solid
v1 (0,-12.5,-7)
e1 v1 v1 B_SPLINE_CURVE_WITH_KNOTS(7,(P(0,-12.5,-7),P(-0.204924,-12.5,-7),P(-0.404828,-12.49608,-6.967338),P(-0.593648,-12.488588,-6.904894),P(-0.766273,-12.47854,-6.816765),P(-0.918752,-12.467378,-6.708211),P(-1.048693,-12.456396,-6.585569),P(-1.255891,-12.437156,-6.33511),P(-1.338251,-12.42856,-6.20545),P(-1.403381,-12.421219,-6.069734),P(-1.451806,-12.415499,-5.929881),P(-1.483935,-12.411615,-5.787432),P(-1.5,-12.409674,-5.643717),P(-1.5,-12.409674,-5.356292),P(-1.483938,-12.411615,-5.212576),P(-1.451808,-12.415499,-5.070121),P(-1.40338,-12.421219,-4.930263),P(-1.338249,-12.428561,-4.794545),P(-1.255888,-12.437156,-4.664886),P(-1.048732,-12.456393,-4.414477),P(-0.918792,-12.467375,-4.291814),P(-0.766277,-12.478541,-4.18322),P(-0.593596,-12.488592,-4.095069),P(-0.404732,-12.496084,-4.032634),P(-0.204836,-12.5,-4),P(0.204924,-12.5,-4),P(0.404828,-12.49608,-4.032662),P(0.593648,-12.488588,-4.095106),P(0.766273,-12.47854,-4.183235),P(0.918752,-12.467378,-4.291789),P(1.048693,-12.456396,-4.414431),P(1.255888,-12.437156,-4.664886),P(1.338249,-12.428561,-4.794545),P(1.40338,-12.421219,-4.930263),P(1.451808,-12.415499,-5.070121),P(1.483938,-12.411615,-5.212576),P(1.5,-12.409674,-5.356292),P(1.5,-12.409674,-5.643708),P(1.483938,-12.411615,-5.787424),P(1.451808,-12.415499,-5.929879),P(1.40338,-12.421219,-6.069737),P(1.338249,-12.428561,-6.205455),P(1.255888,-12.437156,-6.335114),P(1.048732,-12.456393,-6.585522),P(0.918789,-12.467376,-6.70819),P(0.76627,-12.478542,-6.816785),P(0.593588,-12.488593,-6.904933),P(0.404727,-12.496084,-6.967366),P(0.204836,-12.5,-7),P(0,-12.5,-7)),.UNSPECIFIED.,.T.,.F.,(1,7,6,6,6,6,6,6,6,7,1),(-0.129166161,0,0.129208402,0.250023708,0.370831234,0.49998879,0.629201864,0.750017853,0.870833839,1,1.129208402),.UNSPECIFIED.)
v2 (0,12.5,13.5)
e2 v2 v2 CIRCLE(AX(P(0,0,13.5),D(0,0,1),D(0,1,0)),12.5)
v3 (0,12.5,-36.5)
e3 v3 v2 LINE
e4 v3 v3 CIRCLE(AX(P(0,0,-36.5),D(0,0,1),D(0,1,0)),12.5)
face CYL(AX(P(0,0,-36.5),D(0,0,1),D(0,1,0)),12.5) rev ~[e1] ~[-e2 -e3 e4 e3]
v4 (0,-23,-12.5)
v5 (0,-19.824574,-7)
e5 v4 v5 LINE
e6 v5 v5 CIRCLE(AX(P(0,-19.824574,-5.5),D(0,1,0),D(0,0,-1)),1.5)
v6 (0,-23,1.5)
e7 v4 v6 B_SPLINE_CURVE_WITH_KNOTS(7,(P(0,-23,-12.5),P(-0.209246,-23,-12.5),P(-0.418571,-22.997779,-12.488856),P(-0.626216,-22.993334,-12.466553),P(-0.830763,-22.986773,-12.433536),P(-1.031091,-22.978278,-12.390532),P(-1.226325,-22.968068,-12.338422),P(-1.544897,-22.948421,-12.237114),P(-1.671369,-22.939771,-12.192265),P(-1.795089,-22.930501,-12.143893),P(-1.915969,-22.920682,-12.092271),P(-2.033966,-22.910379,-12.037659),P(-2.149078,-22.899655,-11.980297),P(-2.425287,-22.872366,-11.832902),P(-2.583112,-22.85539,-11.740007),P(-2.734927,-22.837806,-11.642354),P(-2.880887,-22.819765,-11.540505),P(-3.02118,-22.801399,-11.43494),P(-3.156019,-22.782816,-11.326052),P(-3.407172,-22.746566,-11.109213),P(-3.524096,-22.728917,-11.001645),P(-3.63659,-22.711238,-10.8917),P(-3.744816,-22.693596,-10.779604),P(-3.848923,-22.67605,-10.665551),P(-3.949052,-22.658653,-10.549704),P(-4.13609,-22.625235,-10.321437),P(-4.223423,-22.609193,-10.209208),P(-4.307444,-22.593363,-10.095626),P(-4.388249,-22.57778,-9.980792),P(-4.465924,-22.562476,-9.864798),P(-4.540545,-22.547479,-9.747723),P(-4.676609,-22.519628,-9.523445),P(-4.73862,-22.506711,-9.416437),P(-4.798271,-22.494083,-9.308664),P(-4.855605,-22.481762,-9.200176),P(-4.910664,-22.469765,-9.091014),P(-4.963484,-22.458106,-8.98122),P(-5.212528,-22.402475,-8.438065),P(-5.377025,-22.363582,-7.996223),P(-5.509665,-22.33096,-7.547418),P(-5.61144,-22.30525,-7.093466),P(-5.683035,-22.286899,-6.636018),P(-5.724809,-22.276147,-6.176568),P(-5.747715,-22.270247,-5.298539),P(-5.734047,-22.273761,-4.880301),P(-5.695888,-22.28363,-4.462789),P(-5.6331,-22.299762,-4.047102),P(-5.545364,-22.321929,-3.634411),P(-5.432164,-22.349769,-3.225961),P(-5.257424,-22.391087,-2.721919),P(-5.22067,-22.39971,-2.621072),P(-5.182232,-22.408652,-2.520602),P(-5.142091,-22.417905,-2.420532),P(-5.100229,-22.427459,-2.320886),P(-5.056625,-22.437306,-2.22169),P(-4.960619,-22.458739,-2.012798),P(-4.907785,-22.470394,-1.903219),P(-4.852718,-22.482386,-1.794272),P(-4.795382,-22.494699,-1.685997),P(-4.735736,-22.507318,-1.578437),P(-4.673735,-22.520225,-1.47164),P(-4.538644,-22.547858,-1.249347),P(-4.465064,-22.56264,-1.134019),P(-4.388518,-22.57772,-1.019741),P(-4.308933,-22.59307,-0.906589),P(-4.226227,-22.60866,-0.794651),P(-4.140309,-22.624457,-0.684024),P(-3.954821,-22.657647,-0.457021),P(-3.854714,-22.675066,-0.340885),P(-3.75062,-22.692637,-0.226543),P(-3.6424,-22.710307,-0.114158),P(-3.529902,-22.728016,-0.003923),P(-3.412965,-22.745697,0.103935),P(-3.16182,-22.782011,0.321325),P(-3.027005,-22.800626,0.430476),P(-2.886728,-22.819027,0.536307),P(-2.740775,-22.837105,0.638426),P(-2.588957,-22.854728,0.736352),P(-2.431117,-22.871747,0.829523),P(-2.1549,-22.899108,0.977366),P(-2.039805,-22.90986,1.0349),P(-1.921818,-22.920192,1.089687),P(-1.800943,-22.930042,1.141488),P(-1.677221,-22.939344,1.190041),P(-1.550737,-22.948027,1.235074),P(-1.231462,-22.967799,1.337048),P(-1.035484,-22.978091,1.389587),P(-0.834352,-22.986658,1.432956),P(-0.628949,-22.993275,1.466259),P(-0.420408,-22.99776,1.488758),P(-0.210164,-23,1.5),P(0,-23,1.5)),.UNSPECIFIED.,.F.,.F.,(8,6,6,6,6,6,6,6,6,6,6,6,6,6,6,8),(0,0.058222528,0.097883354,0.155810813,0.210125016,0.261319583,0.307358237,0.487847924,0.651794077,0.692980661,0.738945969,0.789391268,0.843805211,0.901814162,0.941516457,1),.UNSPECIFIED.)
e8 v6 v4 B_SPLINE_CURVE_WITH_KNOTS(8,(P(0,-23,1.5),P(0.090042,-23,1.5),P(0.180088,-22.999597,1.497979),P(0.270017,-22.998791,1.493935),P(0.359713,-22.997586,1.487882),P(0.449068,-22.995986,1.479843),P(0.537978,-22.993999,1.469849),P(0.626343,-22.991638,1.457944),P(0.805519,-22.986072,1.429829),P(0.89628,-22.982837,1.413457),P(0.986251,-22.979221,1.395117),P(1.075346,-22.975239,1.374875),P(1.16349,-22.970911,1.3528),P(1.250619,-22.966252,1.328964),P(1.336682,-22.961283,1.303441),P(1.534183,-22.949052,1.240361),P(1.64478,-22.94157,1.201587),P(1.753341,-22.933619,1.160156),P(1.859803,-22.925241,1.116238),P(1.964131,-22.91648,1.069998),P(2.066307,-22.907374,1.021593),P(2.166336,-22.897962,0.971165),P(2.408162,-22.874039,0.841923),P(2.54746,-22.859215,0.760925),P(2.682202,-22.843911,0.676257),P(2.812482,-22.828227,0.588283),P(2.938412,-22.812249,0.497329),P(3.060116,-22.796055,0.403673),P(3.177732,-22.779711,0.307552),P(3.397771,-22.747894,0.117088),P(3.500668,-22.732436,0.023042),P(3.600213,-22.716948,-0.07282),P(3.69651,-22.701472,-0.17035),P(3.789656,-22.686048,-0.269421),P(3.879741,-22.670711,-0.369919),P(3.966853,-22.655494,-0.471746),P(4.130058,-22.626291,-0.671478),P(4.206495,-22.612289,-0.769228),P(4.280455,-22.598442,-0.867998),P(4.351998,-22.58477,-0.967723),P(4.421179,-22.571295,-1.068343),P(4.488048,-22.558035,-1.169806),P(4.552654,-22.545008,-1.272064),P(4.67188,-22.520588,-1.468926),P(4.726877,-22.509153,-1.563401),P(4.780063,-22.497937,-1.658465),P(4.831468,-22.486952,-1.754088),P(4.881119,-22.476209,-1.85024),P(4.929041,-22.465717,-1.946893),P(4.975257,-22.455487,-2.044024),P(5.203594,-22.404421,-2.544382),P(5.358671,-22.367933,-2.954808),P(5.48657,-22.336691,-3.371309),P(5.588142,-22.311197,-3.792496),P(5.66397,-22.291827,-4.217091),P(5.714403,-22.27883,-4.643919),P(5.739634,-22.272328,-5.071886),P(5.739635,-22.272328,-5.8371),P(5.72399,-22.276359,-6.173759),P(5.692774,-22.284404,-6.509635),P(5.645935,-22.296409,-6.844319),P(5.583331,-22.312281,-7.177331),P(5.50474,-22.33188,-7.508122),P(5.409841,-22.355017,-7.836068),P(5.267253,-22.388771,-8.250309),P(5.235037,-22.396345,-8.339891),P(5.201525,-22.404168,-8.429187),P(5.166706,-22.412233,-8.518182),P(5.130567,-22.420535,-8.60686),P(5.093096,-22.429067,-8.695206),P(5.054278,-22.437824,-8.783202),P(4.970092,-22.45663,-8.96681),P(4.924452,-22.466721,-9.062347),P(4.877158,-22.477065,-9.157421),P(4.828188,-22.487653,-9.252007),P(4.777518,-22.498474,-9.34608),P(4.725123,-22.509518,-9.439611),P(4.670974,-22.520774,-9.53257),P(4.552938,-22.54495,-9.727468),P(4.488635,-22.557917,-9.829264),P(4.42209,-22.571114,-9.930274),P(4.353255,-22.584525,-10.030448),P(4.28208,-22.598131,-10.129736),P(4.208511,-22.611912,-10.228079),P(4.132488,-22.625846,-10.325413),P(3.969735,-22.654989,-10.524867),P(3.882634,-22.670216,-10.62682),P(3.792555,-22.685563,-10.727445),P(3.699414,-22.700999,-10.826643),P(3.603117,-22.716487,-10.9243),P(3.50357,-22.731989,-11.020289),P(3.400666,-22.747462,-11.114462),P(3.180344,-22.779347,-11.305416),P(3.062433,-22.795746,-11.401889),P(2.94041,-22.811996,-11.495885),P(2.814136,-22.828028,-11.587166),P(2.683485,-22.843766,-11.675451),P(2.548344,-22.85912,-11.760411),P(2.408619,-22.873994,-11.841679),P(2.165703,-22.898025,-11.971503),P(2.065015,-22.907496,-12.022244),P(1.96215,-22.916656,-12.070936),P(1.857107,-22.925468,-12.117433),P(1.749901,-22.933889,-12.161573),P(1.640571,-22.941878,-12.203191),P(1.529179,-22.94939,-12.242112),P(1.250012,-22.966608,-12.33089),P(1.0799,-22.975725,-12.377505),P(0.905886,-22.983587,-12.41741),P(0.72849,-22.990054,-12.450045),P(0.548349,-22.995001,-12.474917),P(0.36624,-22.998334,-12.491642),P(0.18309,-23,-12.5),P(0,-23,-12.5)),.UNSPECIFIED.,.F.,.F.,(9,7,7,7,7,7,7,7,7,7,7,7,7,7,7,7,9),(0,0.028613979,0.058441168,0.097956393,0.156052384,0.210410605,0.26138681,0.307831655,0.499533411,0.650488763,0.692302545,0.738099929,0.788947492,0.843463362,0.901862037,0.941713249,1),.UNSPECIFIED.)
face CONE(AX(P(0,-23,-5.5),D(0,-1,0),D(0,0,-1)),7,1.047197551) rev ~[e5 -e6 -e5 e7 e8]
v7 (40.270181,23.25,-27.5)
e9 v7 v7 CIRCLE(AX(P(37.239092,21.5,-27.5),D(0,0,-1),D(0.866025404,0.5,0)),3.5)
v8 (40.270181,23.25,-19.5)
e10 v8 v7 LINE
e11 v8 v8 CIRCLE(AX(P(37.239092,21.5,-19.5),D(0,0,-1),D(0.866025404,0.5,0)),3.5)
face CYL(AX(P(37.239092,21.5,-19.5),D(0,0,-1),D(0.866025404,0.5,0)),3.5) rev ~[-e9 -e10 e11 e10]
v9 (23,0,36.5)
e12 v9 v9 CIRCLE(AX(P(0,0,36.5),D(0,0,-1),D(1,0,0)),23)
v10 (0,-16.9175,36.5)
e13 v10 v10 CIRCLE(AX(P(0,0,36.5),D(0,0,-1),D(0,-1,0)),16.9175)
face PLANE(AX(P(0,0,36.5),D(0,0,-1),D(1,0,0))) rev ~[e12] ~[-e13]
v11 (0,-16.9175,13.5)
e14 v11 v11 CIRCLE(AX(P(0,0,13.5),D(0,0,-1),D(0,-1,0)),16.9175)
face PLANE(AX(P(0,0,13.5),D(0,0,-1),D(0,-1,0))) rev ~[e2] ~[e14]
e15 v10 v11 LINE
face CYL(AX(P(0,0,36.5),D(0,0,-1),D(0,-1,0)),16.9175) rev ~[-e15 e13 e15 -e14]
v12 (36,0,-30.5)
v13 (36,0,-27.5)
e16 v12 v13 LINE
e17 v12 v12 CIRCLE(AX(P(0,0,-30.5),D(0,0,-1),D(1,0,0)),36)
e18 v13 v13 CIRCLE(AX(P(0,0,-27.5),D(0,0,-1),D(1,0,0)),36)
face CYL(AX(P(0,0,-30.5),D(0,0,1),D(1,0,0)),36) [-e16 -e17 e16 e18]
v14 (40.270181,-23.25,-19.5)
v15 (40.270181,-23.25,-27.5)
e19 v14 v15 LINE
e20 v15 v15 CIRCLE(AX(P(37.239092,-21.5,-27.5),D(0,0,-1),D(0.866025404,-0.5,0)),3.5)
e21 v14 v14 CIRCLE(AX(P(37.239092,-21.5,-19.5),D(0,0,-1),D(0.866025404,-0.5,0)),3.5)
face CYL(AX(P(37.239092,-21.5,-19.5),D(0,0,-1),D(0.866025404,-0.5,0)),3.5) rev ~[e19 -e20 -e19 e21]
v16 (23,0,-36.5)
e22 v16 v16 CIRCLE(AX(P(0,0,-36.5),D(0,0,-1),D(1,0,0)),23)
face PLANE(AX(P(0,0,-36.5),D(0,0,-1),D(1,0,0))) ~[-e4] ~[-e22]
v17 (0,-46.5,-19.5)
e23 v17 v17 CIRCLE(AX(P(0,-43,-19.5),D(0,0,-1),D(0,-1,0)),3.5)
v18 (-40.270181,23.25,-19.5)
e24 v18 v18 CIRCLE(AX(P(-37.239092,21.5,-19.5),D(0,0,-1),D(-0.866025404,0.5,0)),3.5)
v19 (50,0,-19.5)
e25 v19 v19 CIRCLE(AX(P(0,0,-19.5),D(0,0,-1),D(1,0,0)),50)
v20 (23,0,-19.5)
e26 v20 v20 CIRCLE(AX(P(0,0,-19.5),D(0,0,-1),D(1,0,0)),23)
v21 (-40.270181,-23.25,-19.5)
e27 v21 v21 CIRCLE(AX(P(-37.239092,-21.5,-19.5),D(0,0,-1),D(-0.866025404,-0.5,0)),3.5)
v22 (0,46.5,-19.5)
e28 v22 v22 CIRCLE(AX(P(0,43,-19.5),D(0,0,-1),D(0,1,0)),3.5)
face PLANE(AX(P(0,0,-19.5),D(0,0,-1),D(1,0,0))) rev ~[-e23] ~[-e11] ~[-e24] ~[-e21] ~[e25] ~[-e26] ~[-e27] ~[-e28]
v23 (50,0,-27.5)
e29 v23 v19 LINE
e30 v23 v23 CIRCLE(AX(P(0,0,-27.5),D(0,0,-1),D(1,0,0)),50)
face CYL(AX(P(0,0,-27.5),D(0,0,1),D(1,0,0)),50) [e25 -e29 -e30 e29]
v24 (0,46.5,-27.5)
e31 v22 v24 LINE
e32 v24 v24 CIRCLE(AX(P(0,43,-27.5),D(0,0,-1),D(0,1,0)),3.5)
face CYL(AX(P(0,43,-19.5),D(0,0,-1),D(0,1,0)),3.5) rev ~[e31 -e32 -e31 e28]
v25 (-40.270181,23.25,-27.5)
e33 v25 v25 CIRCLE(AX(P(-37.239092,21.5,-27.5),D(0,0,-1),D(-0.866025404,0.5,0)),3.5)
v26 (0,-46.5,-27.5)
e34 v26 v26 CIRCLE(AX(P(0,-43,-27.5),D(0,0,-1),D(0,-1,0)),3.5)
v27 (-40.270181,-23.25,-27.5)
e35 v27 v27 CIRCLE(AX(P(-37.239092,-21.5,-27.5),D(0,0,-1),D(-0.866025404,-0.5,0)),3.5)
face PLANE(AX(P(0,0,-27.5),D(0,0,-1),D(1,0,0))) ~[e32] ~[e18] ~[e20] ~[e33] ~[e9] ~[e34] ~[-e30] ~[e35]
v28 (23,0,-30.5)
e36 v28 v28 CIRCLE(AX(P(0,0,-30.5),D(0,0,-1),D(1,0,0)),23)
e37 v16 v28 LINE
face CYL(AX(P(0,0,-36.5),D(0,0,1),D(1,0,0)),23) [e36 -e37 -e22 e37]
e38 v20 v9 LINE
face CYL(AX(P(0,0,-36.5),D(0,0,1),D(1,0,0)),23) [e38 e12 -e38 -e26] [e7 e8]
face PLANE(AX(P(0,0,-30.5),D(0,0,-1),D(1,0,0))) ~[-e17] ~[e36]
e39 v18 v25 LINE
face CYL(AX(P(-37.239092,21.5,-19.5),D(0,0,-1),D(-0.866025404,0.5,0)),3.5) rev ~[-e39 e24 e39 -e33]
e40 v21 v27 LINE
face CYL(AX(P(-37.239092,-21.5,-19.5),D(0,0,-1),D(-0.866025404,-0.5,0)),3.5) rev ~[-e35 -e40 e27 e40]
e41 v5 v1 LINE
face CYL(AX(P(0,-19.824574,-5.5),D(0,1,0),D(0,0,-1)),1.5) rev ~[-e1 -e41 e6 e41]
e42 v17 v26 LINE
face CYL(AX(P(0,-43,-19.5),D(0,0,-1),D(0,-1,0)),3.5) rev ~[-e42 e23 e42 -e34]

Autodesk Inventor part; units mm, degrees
ref_plane "YZ Plane" through (0, 0, 0) normal (1, 0, 0) x (0, 1, 0)
ref_plane "XY Plane" through (0, 0, 0) normal (0, 0, 1) x (1, 0, 0)
sketch "Sketch1" plane through (0, 0, 0) normal (0, 1, 0) x (-1, 0, 0)
  line L0 (0, -36.5) -> (-23, -36.5)
  line L1 (-23, -36.5) -> (-23, 36.5)
  line L2 (-23, 36.5) -> (0, 36.5)
  line L3 (0, 36.5) -> (0, -36.5)
  line L4 (-23, -30.5) -> (-36, -30.5)
  line L5 (-36, -30.5) -> (-36, -27.5)
  line L6 (-36, -27.5) -> (-50, -27.5)
  line L7 (-50, -27.5) -> (-50, -19.5)
  line L8 (-50, -19.5) -> (-23, -19.5)
  point P0 (0, 0)
  point P1 (0, 0)
  dimension "d0" = 73
  dimension "d1" = 46
  dimension "d2" = 72
  dimension "d3" = 100
  dimension "d5" = 3
  dimension "d6" = 8
  dimension "d41" = 9
revolve "Revolution1" add sketch "Sketch1" angle 360 about axis through (0, 0, 36.5) along (0, 0, -1)
sketch "Sketch2" plane through (0, 0, -36.5) normal (0, 0, -1) x (-1, 0, 0)
  point P0 (0, 0)
hole "Hole1" at (0, 0, -36.5) direction (0, 0, 1) diameter 25 end through all
sketch "Sketch3" plane through (0, 0, 36.5) normal (0, 0, 1) x (1, 0, 0)
  point P0 (0, 0)
hole "Hole2" at (0, 0, 36.5) direction (0, 0, -1) diameter 33.835 depth 23 thread size "M36x2" class "6H" standard "ISO Metric profile"
ref_plane "Work Plane1" through (0, -23, 8.5) normal (0, 1, 0) x (-1, 0, 0)
sketch "Sketch4" plane through (0, -23, 8.5) normal (0, 1, 0) x (-1, 0, 0)
  line L0 (23, 28) -> (-23, 28) construction
  point P0 (0, -8.5)
  point P1 (0, -14)
  dimension "d22" = 42
hole "Hole3" at (0, -23, -5.5) direction (0, 1, 0) diameter 3 end up to surface countersink diameter 14 countersink angle 120
sketch "Sketch5" plane through (0, 0, -19.5) normal (0, 0, 1) x (1, 0, 0)
  circle A0 centre (0, 0) radius 12.5 projected
  circle A1 centre (0, 0) radius 43 construction
  point P0 (0, 0)
  point P1 (0, -43)
  dimension "d30" = 86
hole "Hole4" at (0, -43, -19.5) direction (0, 0, -1) diameter 7 end through all
pattern_circular "Circular Pattern1" count 6 over 360 about axis through (0, 0, -10) along (0, 0, 1) of "Hole4"
properties material "Aluminum 6061"
